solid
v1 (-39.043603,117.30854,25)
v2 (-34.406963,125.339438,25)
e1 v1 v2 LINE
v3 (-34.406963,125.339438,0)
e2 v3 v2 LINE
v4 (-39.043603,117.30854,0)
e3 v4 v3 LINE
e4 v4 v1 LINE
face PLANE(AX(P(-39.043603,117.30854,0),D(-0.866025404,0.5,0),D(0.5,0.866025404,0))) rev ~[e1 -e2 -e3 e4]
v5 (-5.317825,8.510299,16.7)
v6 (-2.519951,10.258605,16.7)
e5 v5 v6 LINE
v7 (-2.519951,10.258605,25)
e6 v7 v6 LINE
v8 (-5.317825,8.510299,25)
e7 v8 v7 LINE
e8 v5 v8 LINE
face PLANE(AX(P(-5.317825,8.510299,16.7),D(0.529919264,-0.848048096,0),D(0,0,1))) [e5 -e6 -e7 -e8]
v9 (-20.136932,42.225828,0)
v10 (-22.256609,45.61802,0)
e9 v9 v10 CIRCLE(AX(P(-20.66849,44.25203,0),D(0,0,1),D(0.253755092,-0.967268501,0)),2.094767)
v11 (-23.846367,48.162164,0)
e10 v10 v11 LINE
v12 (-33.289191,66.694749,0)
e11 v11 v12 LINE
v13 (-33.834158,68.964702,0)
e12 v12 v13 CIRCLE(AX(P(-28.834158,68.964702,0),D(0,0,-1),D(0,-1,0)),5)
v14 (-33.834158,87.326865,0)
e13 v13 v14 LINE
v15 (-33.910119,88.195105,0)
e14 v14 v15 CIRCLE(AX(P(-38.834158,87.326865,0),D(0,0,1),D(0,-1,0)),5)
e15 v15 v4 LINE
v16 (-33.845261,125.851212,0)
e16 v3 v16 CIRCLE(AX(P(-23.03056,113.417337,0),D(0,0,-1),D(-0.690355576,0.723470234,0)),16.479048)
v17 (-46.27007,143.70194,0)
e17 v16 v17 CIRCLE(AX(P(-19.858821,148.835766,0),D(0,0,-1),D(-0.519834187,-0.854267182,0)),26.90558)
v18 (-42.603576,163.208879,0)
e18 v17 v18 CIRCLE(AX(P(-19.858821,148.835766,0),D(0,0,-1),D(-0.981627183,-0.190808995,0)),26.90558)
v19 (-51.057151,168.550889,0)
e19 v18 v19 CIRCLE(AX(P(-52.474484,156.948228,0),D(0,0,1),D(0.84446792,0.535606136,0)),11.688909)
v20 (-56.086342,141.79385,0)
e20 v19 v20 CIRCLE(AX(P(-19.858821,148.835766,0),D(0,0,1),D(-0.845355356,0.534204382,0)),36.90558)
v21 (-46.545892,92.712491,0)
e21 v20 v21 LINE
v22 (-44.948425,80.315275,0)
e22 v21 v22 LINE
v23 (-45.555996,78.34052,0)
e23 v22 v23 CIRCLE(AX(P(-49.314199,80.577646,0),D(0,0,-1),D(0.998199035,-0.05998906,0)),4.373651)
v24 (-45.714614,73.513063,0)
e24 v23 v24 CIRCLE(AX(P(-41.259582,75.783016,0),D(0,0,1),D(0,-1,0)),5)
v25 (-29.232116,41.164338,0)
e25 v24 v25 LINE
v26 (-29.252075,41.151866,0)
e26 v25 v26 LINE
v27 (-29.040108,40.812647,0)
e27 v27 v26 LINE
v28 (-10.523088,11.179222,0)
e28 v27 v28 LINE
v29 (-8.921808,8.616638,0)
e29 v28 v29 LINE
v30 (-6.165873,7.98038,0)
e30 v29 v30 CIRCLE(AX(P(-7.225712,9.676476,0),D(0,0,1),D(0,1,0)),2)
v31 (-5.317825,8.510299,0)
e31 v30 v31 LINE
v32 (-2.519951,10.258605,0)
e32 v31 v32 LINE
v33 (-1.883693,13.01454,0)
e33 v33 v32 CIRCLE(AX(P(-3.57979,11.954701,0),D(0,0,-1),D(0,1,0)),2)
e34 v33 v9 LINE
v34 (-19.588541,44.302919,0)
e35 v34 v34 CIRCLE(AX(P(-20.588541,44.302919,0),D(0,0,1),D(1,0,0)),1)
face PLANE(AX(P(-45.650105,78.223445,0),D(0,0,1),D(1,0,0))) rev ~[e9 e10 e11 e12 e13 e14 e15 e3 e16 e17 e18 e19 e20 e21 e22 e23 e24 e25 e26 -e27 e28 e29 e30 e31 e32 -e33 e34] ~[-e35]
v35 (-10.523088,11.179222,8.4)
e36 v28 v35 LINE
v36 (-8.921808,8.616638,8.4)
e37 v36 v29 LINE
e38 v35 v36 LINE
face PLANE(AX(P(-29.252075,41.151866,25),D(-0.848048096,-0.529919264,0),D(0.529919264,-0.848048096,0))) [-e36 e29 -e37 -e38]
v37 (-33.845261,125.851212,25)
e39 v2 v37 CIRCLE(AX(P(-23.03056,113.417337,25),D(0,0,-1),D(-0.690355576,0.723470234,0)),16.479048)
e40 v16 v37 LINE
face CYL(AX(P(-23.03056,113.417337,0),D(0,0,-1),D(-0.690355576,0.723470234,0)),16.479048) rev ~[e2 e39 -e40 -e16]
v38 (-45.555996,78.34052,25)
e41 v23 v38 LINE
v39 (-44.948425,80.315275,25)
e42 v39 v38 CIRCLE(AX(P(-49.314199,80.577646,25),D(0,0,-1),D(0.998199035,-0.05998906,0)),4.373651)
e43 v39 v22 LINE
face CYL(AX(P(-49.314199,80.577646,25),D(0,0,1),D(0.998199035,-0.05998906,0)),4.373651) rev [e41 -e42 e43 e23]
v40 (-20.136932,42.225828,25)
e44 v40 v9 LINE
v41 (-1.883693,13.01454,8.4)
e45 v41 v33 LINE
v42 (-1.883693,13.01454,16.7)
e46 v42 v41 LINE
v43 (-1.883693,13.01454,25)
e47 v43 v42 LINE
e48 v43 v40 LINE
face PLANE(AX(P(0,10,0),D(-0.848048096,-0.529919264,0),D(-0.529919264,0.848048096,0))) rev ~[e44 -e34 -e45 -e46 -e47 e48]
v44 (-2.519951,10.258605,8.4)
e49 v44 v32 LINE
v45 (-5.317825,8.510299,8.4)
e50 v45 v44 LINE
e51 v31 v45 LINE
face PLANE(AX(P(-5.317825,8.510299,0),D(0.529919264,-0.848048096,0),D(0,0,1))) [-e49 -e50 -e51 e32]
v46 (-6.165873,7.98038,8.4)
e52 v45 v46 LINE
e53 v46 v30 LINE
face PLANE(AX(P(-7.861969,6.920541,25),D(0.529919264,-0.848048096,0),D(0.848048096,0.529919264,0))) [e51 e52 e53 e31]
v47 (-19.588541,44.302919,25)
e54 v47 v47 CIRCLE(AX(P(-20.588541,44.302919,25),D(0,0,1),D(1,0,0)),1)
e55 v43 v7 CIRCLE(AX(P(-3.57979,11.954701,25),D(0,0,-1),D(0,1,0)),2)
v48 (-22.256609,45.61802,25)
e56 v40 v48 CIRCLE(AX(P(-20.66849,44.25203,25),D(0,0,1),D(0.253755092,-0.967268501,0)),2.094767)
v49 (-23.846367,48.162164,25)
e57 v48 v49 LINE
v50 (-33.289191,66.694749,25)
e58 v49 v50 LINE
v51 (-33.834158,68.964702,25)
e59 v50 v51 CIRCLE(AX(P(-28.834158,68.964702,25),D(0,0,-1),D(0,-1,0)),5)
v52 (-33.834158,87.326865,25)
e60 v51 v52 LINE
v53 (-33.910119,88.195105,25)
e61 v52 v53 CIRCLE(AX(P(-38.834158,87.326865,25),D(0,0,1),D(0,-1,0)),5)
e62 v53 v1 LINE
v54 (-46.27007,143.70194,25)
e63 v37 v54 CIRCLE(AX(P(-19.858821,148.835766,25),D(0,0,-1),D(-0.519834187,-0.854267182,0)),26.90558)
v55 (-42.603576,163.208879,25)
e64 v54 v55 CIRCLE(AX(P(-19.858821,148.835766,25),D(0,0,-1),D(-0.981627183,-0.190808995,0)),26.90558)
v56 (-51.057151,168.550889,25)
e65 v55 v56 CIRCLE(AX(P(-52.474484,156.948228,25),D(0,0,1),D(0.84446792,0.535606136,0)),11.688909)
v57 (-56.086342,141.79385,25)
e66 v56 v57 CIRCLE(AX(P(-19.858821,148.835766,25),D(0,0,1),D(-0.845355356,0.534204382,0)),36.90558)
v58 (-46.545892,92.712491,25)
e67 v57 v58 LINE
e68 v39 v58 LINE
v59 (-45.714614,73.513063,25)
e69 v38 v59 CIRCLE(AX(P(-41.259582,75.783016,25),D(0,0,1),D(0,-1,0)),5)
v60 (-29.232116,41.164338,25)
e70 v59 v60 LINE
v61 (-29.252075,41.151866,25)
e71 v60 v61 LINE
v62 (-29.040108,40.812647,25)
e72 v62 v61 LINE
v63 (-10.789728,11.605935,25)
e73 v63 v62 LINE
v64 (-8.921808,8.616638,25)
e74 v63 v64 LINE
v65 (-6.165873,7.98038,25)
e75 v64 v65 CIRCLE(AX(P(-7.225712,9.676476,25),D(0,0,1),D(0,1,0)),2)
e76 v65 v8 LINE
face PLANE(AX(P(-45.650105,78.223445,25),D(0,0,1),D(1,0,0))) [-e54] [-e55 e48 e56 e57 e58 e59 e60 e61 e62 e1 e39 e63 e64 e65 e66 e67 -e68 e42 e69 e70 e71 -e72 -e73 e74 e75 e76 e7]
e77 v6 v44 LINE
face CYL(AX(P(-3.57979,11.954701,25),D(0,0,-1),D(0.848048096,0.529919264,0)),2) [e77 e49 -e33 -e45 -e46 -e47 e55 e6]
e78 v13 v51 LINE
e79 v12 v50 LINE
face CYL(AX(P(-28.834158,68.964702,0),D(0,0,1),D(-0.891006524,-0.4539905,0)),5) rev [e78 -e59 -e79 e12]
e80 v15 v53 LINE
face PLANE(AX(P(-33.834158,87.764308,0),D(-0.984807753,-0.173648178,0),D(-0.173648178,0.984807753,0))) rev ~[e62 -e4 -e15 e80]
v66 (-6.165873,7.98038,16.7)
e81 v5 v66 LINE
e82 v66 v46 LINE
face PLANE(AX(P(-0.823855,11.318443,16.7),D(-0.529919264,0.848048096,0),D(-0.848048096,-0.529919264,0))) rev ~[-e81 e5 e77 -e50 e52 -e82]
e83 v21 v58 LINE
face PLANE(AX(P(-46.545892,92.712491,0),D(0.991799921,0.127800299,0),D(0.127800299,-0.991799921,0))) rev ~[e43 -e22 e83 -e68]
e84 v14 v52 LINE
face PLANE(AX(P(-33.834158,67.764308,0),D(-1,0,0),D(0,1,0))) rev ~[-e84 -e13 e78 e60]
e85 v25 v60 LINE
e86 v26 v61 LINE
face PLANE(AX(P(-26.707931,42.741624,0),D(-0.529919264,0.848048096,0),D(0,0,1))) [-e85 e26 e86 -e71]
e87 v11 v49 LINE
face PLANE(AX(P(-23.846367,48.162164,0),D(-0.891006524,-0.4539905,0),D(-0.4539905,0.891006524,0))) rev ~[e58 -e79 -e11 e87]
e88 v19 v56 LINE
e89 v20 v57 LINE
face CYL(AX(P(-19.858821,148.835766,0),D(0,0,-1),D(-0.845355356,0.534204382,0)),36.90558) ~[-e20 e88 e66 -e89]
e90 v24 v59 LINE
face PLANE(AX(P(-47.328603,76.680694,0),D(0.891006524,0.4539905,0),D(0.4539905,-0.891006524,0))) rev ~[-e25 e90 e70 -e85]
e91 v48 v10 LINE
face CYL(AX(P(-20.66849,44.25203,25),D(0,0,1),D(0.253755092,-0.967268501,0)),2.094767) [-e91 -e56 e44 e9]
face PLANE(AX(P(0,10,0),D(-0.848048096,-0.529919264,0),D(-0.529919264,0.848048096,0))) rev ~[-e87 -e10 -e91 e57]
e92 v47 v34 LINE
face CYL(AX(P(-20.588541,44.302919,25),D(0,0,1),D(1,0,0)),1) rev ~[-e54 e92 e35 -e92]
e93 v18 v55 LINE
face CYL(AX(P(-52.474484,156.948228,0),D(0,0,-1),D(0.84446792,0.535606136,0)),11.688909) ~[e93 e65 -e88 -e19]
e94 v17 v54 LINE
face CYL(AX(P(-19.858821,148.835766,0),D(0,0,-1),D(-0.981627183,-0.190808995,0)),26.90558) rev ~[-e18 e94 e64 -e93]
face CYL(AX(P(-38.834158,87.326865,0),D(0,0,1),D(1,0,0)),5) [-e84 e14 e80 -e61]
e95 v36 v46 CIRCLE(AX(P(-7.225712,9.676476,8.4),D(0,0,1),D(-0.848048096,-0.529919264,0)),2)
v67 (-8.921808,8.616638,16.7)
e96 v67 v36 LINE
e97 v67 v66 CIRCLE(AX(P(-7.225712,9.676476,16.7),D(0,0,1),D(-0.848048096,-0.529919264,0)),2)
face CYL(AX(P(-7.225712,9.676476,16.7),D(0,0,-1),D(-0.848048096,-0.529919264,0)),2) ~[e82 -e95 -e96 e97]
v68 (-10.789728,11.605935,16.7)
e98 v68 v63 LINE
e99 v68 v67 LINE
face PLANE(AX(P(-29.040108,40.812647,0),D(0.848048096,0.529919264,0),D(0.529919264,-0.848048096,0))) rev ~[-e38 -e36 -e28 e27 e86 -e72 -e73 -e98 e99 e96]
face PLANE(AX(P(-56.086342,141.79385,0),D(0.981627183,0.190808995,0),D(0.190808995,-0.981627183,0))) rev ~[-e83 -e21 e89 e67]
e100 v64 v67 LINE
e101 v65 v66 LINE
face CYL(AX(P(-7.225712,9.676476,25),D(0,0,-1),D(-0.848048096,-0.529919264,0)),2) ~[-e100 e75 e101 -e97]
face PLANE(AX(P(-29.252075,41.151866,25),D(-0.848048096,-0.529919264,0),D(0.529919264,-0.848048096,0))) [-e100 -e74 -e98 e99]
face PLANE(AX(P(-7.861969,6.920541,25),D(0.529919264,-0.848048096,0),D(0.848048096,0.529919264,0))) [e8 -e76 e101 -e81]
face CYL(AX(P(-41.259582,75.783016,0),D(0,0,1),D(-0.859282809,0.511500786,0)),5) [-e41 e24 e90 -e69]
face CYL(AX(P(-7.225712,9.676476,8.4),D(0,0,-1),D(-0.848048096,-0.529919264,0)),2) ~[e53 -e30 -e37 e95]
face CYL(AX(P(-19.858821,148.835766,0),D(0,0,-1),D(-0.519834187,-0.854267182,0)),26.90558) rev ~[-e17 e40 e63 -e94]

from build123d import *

# Parameters (mm, degrees)
F1_DEPTH  = 25
F2_DEPTH  = 25
F3_R      = 10.0351609687
F4_DEPTH  = 25
F5_W      = 5.021744368
F5_H      = 8.4
F5_W_2    = 5.524914672
F5_H_2    = 8.3
F6_DEPTH  = 28.7
F7_DEPTH  = 31.3
F8_W      = 20.0703219374
F8_H      = 8.3
F8_H_2    = 8.4
F9_DEPTH  = 25
F10_D     = 15
F11_DEPTH = 3
F12_DEPTH = 3
F13_DEPTH = 0.4
F15_DEPTH = 25
F16_R     = 5
F17_R     = 5
F18_R     = 5
F20_DEPTH = 25
F21_R     = 1
F22_DEPTH = 25
F24_DEPTH = 25
F25_R     = 2


with BuildPart() as f1:
    # F0 (on Top) → F1 (new body)
    with BuildSketch(Plane.XY):
        with BuildLine():
            Line((-46.5458918775, 92.7124905365), (-33.8341578848, 67.7643078592))
            Line((-33.8341578848, 67.7643078592), (-33.8341578848, 87.7643078592))
            Line((-33.8341578848, 87.7643078592), (-39.0436032148, 117.3085404495))
            ThreePointArc((-39.0436032148, 117.3085404495), (-50.1493049738, 127.7523979683), (-56.0863416463, 141.7938497088))
            Line((-56.0863416463, 141.7938497088), (-46.5458918775, 92.7124905365))
        make_face()
        Polygon((-26.4959632117, 42.4024048078), (0, 0), (0, 10), (-23.8463668905, 48.162164327), (-33.8341578848, 67.7643078592), (-46.5458918775, 92.7124905365), (-44.6555832012, 78.0426657754), align=None)
    extrude(amount=F1_DEPTH)

    # F0 (on Top) → F2 (join)
    with BuildSketch(Plane.XY):
        Polygon((-26.4959632117, 42.4024048078), (0, 0), (0, 10), (-23.8463668905, 48.162164327), (-33.8341578848, 67.7643078592), (-46.5458918775, 92.7124905365), (-44.6555832012, 78.0426657754), align=None)
        with BuildLine():
            Line((-46.5458918775, 92.7124905365), (-33.8341578848, 67.7643078592))
            Line((-33.8341578848, 67.7643078592), (-33.8341578848, 87.7643078592))
            Line((-33.8341578848, 87.7643078592), (-39.0436032148, 117.3085404495))
            ThreePointArc((-39.0436032148, 117.3085404495), (-50.1493049738, 127.7523979683), (-56.0863416463, 141.7938497088))
            Line((-56.0863416463, 141.7938497088), (-46.5458918775, 92.7124905365))
        make_face()
        with BuildLine():
            ThreePointArc((-51.0571508097, 168.5508889923), (-56.1292788842, 155.6530772369), (-56.0863416463, 141.7938497088))
            ThreePointArc((-56.0863416463, 141.7938497088), (-50.1493049738, 127.7523979683), (-39.0436032148, 117.3085404495))
            ThreePointArc((-39.0436032148, 117.3085404495), (-37.3018340244, 121.656861024), (-34.4069625383, 125.3394376776))
            ThreePointArc((-34.4069625383, 125.3394376776), (-34.1290622054, 125.5985630521), (-33.8452613454, 125.8512122687))
            ThreePointArc((-33.8452613454, 125.8512122687), (-46.0977457681, 142.6841841118), (-42.6035759811, 163.2088788258))
            ThreePointArc((-42.6035759811, 163.2088788258), (-46.2302574516, 166.8295340113), (-51.0571508097, 168.5508889923))
        make_face()
        with BuildLine():
            ThreePointArc((-34.4069625383, 125.3394376776), (-37.3018340244, 121.656861024), (-39.0436032148, 117.3085404495))
            Line((-39.0436032148, 117.3085404495), (-34.4069625383, 125.3394376776))
        make_face()
        with BuildLine():
            ThreePointArc((-46.2700698118, 143.7019396626), (-46.3013690244, 153.8058664235), (-42.6035759811, 163.2088788258))
            ThreePointArc((-42.6035759811, 163.2088788258), (-46.0977457681, 142.6841841118), (-33.8452613454, 125.8512122687))
            ThreePointArc((-33.8452613454, 125.8512122687), (-41.9417428936, 133.4651840398), (-46.2700698118, 143.7019396626))
        make_face()
    extrude(amount=F2_DEPTH)

    # F3 (on Top) → F4 (join)
    with BuildSketch(Plane.XY):
        Circle(F3_R)
    extrude(amount=F4_DEPTH)

    # F5 (on face) → F6 (join)
    with BuildSketch(Plane(origin=(0, 0, 0), x_dir=(0.5299192642, -0.8480480962, 0), z_dir=(-0.8480480962, -0.5299192642, 0))):
        with Locations((-12.5460331527, 4.2)):
            Rectangle(F5_W, F5_H)
        with Locations((-12.7976183047, 20.85)):
            Rectangle(F5_W_2, F5_H_2)
    extrude(amount=F6_DEPTH)

    # F7 (cut, symmetric): faces of the model
    f7_faces = [f1.faces().sort_by_distance(p)[0] for p in [
        (-17.4873152969, 0.9059577124, 20.85),
        (-17.4873152969, 0.9059577124, 4.2),
    ]]
    extrude(f7_faces, amount=F7_DEPTH, both=True, mode=Mode.SUBTRACT)

    # F8 (on face) → F9 (cut)
    with BuildSketch(Plane(origin=(0, 0, 0), x_dir=(0.5299192642, -0.8480480962, 0), z_dir=(-0.8480480962, -0.5299192642, 0))):
        with Locations((0, 20.85)):
            Rectangle(F8_W, F8_H)
        with Locations((0, 4.2)):
            Rectangle(F8_W, F8_H_2)
    extrude(amount=-F9_DEPTH, mode=Mode.SUBTRACT)

    # F10 (through all)
    with Locations(Plane(origin=(0, 0, 0), x_dir=(1, 0, 0), z_dir=(0, 0, -1))):
        with Locations((0, 0)):
            Hole(F10_D / 2)

    # F11 (add): a face of the model
    f11_faces = [f1.faces().sort_by_distance(p)[0] for p in [
        (-15.9068941643, 25.456351981, 12.5),
    ]]
    extrude(f11_faces, amount=F11_DEPTH)

    # F12 (add): a face of the model
    f12_faces = [f1.faces().sort_by_distance(p)[0] for p in [
        (-35.5757732065, 60.2225352916, 12.5),
    ]]
    extrude(f12_faces, amount=F12_DEPTH)

    # F13 (add): a face of the model
    f13_faces = [f1.faces().sort_by_distance(p)[0] for p in [
        (-27.7680353559, 41.6075259115, 12.5),
    ]]
    extrude(f13_faces, amount=F13_DEPTH)

    # F14 (on face) → F15 (join)
    with BuildSketch(Plane.XY.offset(25)):
        with BuildLine():
            ThreePointArc((-44.9484246095, 80.3152745808), (-45.6553028657, 78.1815440804), (-47.3286027738, 76.6806942761))
            Line((-47.3286027738, 76.6806942761), (-44.6555832012, 78.0426657754))
            Line((-44.6555832012, 78.0426657754), (-44.9484246095, 80.3152745808))
        make_face()
        with BuildLine():
            Line((-44.6555832012, 78.0426657754), (-47.3286027738, 76.6806942761))
            Line((-47.3286027738, 76.6806942761), (-29.2321155859, 41.1643384084))
            Line((-29.2321155859, 41.1643384084), (-29.2520752058, 41.1518662536))
            Line((-29.2520752058, 41.1518662536), (-7.8619694055, 6.9205413615))
            Line((-7.8619694055, 6.9205413615), (-0.8238548855, 11.3184434202))
            Line((-0.8238548855, 11.3184434202), (-23.8463668905, 48.162164327))
            Line((-23.8463668905, 48.162164327), (-33.8341578848, 67.7643078592))
            Line((-33.8341578848, 67.7643078592), (-33.8341578848, 87.7643078592))
            Line((-33.8341578848, 87.7643078592), (-39.0436032148, 117.3085404495))
            Line((-39.0436032148, 117.3085404495), (-34.4069625383, 125.3394376776))
            ThreePointArc((-34.4069625383, 125.3394376776), (-34.1290622054, 125.5985630521), (-33.8452613454, 125.8512122687))
            ThreePointArc((-33.8452613454, 125.8512122687), (-46.0541257293, 142.6944106077), (-42.6035759811, 163.2088788258))
            ThreePointArc((-42.6035759811, 163.2088788258), (-46.2302574516, 166.8295340113), (-51.0571508097, 168.5508889923))
            ThreePointArc((-51.0571508097, 168.5508889923), (-56.1292788842, 155.6530772369), (-56.0863416463, 141.7938497088))
            Line((-56.0863416463, 141.7938497088), (-46.5458918775, 92.7124905365))
            Line((-46.5458918775, 92.7124905365), (-45.1575485807, 81.9381904826))
            ThreePointArc((-45.1575485807, 81.9381904826), (-44.9764120983, 81.1365996867), (-44.9484246095, 80.3152745808))
            Line((-44.9484246095, 80.3152745808), (-44.6555832012, 78.0426657754))
        make_face()
    extrude(amount=-F15_DEPTH)

    # F16
    f16_edges = [f1.edges().sort_by_distance(p)[0] for p in [
        (-47.328603, 76.680694, 12.5),
    ]]
    fillet(f16_edges, radius=F16_R)

    # F17
    f17_edges = [f1.edges().sort_by_distance(p)[0] for p in [
        (-33.834158, 67.764308, 12.5),
    ]]
    fillet(f17_edges, radius=F17_R)

    # F18
    f18_edges = [f1.edges().sort_by_distance(p)[0] for p in [
        (-33.834158, 87.764308, 12.5),
    ]]
    fillet(f18_edges, radius=F18_R)

    # F19 (on face) → F20 (join)
    with BuildSketch(Plane.XY.offset(25)):
        with BuildLine():
            Line((-22.2566090978, 45.6180200386), (-20.1369320409, 42.2258276539))
            ThreePointArc((-20.1369320409, 42.2258276539), (-18.8920264045, 45.3620878389), (-22.2566090978, 45.6180200386))
        make_face()
    extrude(amount=-F20_DEPTH)

    # F21 (on face) → F22 (cut)
    with BuildSketch(Plane.XY.offset(25)):
        with Locations((-20.5885408694, 44.3029189806)):
            Circle(F21_R)
    extrude(amount=-F22_DEPTH, mode=Mode.SUBTRACT)

    # F23 (on face) → F24 (cut)
    with BuildSketch(Plane.XY.offset(16.7)):
        Polygon((-21.581498906, -1.6523721461), (-21.581498906, -2.9845223762), (2.6676976122, -15.5032956973), (23.1070481241, 1.1343396036), (-0.8238548855, 11.3184434202), align=None)
    extrude(amount=-F24_DEPTH, mode=Mode.SUBTRACT)

    # F25
    f25_edges = [f1.edges().sort_by_distance(p)[0] for p in [
        (-0.823855, 11.318443, 12.5),
        (-7.861969, 6.920541, 12.5),
    ]]
    fillet(f25_edges, radius=F25_R)


solid = f1.part
